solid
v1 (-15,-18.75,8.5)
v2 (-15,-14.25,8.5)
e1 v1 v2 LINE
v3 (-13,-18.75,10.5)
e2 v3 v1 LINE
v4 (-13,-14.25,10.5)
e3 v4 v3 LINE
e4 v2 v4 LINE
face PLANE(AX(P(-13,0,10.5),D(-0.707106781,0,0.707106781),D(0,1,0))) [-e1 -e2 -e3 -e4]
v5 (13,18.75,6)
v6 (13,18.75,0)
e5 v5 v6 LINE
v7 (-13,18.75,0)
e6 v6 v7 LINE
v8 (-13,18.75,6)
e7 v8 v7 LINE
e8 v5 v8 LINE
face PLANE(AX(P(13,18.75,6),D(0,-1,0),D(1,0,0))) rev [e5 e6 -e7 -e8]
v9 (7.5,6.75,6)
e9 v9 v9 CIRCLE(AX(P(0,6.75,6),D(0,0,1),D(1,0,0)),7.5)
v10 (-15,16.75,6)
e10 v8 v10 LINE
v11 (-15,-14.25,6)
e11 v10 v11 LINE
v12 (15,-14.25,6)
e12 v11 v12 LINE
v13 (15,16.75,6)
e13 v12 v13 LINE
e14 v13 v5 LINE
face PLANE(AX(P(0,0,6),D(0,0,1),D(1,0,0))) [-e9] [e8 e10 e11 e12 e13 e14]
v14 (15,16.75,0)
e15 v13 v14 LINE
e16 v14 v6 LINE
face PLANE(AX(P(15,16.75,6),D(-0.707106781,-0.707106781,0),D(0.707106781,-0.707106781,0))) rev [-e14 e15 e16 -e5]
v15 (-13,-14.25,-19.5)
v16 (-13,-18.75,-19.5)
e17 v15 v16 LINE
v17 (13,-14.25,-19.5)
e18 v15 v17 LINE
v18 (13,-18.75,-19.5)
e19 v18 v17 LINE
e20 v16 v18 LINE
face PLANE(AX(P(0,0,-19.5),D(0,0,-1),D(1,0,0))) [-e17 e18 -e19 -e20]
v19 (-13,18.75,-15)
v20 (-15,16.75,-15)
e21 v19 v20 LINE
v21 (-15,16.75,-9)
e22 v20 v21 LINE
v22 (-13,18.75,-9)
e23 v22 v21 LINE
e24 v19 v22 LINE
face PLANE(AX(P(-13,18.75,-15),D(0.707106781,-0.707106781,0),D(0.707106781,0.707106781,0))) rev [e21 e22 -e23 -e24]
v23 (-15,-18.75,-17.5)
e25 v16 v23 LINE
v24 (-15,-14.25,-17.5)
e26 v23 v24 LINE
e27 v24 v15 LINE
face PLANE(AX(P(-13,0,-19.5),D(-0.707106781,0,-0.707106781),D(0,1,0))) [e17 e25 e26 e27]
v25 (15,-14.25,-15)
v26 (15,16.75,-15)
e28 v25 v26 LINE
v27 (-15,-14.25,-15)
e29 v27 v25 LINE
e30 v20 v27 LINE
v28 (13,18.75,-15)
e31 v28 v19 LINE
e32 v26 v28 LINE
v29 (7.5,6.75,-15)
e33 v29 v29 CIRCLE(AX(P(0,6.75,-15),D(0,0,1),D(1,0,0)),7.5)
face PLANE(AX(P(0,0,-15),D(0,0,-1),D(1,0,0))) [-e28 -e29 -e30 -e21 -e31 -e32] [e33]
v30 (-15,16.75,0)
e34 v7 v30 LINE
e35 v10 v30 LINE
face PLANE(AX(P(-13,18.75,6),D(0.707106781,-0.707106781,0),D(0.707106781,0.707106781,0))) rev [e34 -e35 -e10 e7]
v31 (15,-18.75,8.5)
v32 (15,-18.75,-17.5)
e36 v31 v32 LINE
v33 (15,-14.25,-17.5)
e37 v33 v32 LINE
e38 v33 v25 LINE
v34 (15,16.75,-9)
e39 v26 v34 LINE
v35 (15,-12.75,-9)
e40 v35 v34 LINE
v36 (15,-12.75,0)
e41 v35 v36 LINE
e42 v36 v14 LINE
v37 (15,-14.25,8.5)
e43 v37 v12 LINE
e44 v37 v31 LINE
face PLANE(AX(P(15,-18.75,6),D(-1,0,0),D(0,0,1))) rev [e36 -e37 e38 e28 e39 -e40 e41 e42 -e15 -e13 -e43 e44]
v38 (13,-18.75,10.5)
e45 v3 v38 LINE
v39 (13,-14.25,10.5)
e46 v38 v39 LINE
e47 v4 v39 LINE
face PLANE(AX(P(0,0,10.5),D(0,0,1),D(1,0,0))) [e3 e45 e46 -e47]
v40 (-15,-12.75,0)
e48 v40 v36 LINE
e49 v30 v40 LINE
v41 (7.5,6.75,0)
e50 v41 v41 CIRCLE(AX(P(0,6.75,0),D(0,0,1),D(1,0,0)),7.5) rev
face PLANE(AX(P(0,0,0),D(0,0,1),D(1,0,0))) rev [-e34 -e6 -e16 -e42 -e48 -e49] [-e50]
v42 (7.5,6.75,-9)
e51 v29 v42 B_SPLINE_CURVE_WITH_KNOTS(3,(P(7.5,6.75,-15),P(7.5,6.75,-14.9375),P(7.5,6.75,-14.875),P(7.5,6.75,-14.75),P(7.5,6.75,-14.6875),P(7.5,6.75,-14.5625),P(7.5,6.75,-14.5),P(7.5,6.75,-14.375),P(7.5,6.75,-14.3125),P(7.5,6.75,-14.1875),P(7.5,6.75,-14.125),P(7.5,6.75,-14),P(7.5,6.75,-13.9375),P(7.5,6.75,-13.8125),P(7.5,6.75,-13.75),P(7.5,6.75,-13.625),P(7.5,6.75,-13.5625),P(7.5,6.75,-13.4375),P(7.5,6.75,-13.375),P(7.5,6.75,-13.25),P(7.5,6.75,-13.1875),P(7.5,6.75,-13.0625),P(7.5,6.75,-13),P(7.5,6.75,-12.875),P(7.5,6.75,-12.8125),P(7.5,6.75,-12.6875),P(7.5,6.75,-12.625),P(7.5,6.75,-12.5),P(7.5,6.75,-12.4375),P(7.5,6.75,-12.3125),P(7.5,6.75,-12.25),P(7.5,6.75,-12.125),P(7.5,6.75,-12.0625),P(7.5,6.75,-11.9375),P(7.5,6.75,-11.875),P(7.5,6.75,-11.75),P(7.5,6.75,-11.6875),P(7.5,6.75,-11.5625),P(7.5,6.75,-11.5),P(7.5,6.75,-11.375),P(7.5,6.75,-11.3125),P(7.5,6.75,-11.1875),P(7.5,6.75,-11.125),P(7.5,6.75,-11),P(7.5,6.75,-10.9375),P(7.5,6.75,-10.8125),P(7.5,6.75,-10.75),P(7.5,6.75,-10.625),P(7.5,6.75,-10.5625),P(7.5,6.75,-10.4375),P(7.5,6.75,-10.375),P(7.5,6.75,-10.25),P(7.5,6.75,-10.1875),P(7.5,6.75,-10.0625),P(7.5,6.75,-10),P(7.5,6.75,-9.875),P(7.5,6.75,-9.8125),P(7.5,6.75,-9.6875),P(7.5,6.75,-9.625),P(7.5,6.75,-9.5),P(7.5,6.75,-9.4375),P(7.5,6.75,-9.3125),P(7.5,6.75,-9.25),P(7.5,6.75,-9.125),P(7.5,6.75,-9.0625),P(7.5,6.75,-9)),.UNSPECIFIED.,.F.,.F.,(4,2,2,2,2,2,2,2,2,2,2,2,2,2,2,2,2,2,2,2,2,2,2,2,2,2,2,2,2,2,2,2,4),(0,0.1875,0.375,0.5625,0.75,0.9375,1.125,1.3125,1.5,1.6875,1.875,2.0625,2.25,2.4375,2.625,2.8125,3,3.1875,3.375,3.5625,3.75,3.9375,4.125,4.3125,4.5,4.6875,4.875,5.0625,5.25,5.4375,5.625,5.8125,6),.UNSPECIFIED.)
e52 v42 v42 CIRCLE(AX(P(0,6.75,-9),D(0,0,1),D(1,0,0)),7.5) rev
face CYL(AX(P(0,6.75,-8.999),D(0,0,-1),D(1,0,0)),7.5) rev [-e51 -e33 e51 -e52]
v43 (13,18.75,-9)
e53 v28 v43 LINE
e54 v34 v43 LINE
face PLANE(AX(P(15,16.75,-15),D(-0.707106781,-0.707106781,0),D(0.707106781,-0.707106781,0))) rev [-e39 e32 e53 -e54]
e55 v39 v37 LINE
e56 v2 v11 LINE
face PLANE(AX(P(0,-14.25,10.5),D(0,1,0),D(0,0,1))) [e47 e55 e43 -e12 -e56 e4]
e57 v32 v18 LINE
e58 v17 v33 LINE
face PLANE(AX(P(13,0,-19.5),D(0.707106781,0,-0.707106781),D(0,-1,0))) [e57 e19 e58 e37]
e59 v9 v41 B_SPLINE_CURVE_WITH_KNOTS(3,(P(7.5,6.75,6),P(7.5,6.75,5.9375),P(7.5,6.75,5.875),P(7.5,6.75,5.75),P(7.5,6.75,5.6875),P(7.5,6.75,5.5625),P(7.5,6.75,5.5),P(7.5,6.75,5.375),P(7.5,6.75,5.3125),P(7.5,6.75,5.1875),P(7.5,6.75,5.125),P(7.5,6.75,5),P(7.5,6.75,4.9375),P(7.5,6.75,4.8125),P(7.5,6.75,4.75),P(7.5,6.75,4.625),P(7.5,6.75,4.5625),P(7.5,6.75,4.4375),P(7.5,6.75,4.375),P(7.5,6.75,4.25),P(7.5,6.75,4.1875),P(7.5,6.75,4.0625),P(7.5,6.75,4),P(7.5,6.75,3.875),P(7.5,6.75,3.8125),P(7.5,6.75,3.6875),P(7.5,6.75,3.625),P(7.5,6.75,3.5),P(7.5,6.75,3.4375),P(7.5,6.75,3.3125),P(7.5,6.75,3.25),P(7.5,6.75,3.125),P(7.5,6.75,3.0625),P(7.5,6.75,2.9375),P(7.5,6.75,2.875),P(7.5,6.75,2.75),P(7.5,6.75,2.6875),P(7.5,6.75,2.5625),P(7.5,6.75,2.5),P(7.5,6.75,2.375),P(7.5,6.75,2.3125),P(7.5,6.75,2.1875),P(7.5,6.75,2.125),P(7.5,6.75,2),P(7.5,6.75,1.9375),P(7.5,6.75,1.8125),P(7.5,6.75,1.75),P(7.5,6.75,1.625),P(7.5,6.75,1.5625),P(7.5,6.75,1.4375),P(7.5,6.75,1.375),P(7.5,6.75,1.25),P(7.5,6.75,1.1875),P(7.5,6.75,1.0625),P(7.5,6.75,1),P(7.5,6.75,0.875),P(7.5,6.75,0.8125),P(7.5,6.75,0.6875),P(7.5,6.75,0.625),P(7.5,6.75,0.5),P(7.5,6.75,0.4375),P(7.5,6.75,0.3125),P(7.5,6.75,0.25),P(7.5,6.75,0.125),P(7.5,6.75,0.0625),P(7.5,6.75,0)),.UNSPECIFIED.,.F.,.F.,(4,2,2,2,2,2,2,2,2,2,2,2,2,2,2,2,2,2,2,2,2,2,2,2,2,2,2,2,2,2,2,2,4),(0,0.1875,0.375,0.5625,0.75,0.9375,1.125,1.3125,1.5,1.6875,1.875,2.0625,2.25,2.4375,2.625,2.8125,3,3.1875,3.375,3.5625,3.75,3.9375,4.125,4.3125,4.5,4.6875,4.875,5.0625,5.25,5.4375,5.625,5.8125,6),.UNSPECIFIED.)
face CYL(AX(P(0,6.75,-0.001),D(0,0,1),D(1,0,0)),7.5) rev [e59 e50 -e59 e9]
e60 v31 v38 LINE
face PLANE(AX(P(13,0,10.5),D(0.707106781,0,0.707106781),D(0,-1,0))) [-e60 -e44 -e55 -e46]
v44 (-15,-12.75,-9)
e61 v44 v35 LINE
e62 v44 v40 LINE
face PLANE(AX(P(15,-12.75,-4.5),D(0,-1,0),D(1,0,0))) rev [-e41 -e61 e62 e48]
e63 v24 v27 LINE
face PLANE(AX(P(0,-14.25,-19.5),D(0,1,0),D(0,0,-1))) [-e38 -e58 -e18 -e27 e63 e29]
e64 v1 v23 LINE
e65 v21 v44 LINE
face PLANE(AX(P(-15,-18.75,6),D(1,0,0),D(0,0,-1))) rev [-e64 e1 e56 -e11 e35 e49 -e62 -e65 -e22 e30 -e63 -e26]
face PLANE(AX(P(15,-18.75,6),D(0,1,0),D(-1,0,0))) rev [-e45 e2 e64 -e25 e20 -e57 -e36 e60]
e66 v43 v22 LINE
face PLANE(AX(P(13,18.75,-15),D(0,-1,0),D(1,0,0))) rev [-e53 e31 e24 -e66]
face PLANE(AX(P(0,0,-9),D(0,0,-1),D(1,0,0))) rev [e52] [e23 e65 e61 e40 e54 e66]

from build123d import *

# Parameters (mm, degrees)
EXTRUDE_1_DEPTH            = 6
SKETCH_8_W                 = 30
SKETCH_8_H                 = 4.5
EXTRUDE_4_DEPTH            = 4.5
CHAMFER_1_SIZE             = 2
CHAMFER_2_SIZE             = 2
CUT_EXTRUDE_2_REACH        = 26.75
SKETCH_8_5_R               = 7.5
SKETCH_13_W                = 30
SKETCH_13_H                = 6
EXTRUDE_5_DEPTH            = 4.5
CHAMFER_1_OF_MIRROR_4_SIZE = 2
CHAMFER_2_OF_MIRROR_4_SIZE = 2


with BuildPart() as part:
    # 草图1 → 凸台-拉伸1 (new body)
    with BuildSketch(Plane.XY):
        Polygon((-13, 18.75), (-15, 16.75), (-15, -18.75), (15, -18.75), (15, 16.75), (13, 18.75), align=None)
    extrude_1 = extrude(amount=EXTRUDE_1_DEPTH)

    # 草图8 → 凸台-拉伸4 (add)
    with BuildSketch(Plane.XY.offset(6)):
        with Locations((0, -16.5)):
            Rectangle(SKETCH_8_W, SKETCH_8_H)
    extrude_4 = extrude(amount=EXTRUDE_4_DEPTH)

    # 倒角1
    chamfer_1_edges = [part.edges().sort_by_distance(p)[0] for p in [
        (-15, -16.5, 10.5),
    ]]
    chamfer(chamfer_1_edges, length=CHAMFER_1_SIZE)

    # 倒角2
    chamfer_2_edges = [part.edges().sort_by_distance(p)[0] for p in [
        (15, -16.5, 10.5),
    ]]
    chamfer(chamfer_2_edges, length=CHAMFER_2_SIZE)

    # 草图8<5> → 切除-拉伸2 (cut, up to next)
    with BuildSketch(Plane.XY.offset(6), mode=Mode.PRIVATE) as cut_extrude_2_sk1:
        with Locations((0, 6.75)):
            Circle(SKETCH_8_5_R)
    cut_extrude_2_tool1 = extrude(cut_extrude_2_sk1.sketch, amount=-CUT_EXTRUDE_2_REACH, mode=Mode.PRIVATE) & part.part
    cut_extrude_2 = cut_extrude_2_tool1.solids().sort_by_distance((0, 6.75, 6))[0]
    add(cut_extrude_2, mode=Mode.SUBTRACT)

    # 草图13 → 凸台-拉伸5 (add)
    with BuildSketch(Plane(origin=(0, 0, 0), x_dir=(-1, 0, 0), z_dir=(0, 0, -1))):
        with Locations((0, -15.75)):
            Rectangle(SKETCH_13_W, SKETCH_13_H)
    extrude_5 = extrude(amount=EXTRUDE_5_DEPTH)

    # 镜向4: 凸台-拉伸1, 凸台-拉伸4, 切除-拉伸2, 凸台-拉伸5 across plane
    add(extrude_1.mirror(Plane(origin=(0, 0, -4.5), x_dir=(1, 0, 0), z_dir=(0, 0, -1))))
    add(extrude_4.mirror(Plane(origin=(0, 0, -4.5), x_dir=(1, 0, 0), z_dir=(0, 0, -1))))
    add(cut_extrude_2.mirror(Plane(origin=(0, 0, -4.5), x_dir=(1, 0, 0), z_dir=(0, 0, -1))), mode=Mode.SUBTRACT)
    add(extrude_5.mirror(Plane(origin=(0, 0, -4.5), x_dir=(1, 0, 0), z_dir=(0, 0, -1))))

    # 倒角1 of 镜向4
    chamfer_1_of_mirror_4_edges = [part.edges().sort_by_distance(p)[0] for p in [
        (-15, -16.5, -19.5),
    ]]
    chamfer(chamfer_1_of_mirror_4_edges, length=CHAMFER_1_OF_MIRROR_4_SIZE)

    # 倒角2 of 镜向4
    chamfer_2_of_mirror_4_edges = [part.edges().sort_by_distance(p)[0] for p in [
        (15, -16.5, -19.5),
    ]]
    chamfer(chamfer_2_of_mirror_4_edges, length=CHAMFER_2_OF_MIRROR_4_SIZE)


solid = part.part
